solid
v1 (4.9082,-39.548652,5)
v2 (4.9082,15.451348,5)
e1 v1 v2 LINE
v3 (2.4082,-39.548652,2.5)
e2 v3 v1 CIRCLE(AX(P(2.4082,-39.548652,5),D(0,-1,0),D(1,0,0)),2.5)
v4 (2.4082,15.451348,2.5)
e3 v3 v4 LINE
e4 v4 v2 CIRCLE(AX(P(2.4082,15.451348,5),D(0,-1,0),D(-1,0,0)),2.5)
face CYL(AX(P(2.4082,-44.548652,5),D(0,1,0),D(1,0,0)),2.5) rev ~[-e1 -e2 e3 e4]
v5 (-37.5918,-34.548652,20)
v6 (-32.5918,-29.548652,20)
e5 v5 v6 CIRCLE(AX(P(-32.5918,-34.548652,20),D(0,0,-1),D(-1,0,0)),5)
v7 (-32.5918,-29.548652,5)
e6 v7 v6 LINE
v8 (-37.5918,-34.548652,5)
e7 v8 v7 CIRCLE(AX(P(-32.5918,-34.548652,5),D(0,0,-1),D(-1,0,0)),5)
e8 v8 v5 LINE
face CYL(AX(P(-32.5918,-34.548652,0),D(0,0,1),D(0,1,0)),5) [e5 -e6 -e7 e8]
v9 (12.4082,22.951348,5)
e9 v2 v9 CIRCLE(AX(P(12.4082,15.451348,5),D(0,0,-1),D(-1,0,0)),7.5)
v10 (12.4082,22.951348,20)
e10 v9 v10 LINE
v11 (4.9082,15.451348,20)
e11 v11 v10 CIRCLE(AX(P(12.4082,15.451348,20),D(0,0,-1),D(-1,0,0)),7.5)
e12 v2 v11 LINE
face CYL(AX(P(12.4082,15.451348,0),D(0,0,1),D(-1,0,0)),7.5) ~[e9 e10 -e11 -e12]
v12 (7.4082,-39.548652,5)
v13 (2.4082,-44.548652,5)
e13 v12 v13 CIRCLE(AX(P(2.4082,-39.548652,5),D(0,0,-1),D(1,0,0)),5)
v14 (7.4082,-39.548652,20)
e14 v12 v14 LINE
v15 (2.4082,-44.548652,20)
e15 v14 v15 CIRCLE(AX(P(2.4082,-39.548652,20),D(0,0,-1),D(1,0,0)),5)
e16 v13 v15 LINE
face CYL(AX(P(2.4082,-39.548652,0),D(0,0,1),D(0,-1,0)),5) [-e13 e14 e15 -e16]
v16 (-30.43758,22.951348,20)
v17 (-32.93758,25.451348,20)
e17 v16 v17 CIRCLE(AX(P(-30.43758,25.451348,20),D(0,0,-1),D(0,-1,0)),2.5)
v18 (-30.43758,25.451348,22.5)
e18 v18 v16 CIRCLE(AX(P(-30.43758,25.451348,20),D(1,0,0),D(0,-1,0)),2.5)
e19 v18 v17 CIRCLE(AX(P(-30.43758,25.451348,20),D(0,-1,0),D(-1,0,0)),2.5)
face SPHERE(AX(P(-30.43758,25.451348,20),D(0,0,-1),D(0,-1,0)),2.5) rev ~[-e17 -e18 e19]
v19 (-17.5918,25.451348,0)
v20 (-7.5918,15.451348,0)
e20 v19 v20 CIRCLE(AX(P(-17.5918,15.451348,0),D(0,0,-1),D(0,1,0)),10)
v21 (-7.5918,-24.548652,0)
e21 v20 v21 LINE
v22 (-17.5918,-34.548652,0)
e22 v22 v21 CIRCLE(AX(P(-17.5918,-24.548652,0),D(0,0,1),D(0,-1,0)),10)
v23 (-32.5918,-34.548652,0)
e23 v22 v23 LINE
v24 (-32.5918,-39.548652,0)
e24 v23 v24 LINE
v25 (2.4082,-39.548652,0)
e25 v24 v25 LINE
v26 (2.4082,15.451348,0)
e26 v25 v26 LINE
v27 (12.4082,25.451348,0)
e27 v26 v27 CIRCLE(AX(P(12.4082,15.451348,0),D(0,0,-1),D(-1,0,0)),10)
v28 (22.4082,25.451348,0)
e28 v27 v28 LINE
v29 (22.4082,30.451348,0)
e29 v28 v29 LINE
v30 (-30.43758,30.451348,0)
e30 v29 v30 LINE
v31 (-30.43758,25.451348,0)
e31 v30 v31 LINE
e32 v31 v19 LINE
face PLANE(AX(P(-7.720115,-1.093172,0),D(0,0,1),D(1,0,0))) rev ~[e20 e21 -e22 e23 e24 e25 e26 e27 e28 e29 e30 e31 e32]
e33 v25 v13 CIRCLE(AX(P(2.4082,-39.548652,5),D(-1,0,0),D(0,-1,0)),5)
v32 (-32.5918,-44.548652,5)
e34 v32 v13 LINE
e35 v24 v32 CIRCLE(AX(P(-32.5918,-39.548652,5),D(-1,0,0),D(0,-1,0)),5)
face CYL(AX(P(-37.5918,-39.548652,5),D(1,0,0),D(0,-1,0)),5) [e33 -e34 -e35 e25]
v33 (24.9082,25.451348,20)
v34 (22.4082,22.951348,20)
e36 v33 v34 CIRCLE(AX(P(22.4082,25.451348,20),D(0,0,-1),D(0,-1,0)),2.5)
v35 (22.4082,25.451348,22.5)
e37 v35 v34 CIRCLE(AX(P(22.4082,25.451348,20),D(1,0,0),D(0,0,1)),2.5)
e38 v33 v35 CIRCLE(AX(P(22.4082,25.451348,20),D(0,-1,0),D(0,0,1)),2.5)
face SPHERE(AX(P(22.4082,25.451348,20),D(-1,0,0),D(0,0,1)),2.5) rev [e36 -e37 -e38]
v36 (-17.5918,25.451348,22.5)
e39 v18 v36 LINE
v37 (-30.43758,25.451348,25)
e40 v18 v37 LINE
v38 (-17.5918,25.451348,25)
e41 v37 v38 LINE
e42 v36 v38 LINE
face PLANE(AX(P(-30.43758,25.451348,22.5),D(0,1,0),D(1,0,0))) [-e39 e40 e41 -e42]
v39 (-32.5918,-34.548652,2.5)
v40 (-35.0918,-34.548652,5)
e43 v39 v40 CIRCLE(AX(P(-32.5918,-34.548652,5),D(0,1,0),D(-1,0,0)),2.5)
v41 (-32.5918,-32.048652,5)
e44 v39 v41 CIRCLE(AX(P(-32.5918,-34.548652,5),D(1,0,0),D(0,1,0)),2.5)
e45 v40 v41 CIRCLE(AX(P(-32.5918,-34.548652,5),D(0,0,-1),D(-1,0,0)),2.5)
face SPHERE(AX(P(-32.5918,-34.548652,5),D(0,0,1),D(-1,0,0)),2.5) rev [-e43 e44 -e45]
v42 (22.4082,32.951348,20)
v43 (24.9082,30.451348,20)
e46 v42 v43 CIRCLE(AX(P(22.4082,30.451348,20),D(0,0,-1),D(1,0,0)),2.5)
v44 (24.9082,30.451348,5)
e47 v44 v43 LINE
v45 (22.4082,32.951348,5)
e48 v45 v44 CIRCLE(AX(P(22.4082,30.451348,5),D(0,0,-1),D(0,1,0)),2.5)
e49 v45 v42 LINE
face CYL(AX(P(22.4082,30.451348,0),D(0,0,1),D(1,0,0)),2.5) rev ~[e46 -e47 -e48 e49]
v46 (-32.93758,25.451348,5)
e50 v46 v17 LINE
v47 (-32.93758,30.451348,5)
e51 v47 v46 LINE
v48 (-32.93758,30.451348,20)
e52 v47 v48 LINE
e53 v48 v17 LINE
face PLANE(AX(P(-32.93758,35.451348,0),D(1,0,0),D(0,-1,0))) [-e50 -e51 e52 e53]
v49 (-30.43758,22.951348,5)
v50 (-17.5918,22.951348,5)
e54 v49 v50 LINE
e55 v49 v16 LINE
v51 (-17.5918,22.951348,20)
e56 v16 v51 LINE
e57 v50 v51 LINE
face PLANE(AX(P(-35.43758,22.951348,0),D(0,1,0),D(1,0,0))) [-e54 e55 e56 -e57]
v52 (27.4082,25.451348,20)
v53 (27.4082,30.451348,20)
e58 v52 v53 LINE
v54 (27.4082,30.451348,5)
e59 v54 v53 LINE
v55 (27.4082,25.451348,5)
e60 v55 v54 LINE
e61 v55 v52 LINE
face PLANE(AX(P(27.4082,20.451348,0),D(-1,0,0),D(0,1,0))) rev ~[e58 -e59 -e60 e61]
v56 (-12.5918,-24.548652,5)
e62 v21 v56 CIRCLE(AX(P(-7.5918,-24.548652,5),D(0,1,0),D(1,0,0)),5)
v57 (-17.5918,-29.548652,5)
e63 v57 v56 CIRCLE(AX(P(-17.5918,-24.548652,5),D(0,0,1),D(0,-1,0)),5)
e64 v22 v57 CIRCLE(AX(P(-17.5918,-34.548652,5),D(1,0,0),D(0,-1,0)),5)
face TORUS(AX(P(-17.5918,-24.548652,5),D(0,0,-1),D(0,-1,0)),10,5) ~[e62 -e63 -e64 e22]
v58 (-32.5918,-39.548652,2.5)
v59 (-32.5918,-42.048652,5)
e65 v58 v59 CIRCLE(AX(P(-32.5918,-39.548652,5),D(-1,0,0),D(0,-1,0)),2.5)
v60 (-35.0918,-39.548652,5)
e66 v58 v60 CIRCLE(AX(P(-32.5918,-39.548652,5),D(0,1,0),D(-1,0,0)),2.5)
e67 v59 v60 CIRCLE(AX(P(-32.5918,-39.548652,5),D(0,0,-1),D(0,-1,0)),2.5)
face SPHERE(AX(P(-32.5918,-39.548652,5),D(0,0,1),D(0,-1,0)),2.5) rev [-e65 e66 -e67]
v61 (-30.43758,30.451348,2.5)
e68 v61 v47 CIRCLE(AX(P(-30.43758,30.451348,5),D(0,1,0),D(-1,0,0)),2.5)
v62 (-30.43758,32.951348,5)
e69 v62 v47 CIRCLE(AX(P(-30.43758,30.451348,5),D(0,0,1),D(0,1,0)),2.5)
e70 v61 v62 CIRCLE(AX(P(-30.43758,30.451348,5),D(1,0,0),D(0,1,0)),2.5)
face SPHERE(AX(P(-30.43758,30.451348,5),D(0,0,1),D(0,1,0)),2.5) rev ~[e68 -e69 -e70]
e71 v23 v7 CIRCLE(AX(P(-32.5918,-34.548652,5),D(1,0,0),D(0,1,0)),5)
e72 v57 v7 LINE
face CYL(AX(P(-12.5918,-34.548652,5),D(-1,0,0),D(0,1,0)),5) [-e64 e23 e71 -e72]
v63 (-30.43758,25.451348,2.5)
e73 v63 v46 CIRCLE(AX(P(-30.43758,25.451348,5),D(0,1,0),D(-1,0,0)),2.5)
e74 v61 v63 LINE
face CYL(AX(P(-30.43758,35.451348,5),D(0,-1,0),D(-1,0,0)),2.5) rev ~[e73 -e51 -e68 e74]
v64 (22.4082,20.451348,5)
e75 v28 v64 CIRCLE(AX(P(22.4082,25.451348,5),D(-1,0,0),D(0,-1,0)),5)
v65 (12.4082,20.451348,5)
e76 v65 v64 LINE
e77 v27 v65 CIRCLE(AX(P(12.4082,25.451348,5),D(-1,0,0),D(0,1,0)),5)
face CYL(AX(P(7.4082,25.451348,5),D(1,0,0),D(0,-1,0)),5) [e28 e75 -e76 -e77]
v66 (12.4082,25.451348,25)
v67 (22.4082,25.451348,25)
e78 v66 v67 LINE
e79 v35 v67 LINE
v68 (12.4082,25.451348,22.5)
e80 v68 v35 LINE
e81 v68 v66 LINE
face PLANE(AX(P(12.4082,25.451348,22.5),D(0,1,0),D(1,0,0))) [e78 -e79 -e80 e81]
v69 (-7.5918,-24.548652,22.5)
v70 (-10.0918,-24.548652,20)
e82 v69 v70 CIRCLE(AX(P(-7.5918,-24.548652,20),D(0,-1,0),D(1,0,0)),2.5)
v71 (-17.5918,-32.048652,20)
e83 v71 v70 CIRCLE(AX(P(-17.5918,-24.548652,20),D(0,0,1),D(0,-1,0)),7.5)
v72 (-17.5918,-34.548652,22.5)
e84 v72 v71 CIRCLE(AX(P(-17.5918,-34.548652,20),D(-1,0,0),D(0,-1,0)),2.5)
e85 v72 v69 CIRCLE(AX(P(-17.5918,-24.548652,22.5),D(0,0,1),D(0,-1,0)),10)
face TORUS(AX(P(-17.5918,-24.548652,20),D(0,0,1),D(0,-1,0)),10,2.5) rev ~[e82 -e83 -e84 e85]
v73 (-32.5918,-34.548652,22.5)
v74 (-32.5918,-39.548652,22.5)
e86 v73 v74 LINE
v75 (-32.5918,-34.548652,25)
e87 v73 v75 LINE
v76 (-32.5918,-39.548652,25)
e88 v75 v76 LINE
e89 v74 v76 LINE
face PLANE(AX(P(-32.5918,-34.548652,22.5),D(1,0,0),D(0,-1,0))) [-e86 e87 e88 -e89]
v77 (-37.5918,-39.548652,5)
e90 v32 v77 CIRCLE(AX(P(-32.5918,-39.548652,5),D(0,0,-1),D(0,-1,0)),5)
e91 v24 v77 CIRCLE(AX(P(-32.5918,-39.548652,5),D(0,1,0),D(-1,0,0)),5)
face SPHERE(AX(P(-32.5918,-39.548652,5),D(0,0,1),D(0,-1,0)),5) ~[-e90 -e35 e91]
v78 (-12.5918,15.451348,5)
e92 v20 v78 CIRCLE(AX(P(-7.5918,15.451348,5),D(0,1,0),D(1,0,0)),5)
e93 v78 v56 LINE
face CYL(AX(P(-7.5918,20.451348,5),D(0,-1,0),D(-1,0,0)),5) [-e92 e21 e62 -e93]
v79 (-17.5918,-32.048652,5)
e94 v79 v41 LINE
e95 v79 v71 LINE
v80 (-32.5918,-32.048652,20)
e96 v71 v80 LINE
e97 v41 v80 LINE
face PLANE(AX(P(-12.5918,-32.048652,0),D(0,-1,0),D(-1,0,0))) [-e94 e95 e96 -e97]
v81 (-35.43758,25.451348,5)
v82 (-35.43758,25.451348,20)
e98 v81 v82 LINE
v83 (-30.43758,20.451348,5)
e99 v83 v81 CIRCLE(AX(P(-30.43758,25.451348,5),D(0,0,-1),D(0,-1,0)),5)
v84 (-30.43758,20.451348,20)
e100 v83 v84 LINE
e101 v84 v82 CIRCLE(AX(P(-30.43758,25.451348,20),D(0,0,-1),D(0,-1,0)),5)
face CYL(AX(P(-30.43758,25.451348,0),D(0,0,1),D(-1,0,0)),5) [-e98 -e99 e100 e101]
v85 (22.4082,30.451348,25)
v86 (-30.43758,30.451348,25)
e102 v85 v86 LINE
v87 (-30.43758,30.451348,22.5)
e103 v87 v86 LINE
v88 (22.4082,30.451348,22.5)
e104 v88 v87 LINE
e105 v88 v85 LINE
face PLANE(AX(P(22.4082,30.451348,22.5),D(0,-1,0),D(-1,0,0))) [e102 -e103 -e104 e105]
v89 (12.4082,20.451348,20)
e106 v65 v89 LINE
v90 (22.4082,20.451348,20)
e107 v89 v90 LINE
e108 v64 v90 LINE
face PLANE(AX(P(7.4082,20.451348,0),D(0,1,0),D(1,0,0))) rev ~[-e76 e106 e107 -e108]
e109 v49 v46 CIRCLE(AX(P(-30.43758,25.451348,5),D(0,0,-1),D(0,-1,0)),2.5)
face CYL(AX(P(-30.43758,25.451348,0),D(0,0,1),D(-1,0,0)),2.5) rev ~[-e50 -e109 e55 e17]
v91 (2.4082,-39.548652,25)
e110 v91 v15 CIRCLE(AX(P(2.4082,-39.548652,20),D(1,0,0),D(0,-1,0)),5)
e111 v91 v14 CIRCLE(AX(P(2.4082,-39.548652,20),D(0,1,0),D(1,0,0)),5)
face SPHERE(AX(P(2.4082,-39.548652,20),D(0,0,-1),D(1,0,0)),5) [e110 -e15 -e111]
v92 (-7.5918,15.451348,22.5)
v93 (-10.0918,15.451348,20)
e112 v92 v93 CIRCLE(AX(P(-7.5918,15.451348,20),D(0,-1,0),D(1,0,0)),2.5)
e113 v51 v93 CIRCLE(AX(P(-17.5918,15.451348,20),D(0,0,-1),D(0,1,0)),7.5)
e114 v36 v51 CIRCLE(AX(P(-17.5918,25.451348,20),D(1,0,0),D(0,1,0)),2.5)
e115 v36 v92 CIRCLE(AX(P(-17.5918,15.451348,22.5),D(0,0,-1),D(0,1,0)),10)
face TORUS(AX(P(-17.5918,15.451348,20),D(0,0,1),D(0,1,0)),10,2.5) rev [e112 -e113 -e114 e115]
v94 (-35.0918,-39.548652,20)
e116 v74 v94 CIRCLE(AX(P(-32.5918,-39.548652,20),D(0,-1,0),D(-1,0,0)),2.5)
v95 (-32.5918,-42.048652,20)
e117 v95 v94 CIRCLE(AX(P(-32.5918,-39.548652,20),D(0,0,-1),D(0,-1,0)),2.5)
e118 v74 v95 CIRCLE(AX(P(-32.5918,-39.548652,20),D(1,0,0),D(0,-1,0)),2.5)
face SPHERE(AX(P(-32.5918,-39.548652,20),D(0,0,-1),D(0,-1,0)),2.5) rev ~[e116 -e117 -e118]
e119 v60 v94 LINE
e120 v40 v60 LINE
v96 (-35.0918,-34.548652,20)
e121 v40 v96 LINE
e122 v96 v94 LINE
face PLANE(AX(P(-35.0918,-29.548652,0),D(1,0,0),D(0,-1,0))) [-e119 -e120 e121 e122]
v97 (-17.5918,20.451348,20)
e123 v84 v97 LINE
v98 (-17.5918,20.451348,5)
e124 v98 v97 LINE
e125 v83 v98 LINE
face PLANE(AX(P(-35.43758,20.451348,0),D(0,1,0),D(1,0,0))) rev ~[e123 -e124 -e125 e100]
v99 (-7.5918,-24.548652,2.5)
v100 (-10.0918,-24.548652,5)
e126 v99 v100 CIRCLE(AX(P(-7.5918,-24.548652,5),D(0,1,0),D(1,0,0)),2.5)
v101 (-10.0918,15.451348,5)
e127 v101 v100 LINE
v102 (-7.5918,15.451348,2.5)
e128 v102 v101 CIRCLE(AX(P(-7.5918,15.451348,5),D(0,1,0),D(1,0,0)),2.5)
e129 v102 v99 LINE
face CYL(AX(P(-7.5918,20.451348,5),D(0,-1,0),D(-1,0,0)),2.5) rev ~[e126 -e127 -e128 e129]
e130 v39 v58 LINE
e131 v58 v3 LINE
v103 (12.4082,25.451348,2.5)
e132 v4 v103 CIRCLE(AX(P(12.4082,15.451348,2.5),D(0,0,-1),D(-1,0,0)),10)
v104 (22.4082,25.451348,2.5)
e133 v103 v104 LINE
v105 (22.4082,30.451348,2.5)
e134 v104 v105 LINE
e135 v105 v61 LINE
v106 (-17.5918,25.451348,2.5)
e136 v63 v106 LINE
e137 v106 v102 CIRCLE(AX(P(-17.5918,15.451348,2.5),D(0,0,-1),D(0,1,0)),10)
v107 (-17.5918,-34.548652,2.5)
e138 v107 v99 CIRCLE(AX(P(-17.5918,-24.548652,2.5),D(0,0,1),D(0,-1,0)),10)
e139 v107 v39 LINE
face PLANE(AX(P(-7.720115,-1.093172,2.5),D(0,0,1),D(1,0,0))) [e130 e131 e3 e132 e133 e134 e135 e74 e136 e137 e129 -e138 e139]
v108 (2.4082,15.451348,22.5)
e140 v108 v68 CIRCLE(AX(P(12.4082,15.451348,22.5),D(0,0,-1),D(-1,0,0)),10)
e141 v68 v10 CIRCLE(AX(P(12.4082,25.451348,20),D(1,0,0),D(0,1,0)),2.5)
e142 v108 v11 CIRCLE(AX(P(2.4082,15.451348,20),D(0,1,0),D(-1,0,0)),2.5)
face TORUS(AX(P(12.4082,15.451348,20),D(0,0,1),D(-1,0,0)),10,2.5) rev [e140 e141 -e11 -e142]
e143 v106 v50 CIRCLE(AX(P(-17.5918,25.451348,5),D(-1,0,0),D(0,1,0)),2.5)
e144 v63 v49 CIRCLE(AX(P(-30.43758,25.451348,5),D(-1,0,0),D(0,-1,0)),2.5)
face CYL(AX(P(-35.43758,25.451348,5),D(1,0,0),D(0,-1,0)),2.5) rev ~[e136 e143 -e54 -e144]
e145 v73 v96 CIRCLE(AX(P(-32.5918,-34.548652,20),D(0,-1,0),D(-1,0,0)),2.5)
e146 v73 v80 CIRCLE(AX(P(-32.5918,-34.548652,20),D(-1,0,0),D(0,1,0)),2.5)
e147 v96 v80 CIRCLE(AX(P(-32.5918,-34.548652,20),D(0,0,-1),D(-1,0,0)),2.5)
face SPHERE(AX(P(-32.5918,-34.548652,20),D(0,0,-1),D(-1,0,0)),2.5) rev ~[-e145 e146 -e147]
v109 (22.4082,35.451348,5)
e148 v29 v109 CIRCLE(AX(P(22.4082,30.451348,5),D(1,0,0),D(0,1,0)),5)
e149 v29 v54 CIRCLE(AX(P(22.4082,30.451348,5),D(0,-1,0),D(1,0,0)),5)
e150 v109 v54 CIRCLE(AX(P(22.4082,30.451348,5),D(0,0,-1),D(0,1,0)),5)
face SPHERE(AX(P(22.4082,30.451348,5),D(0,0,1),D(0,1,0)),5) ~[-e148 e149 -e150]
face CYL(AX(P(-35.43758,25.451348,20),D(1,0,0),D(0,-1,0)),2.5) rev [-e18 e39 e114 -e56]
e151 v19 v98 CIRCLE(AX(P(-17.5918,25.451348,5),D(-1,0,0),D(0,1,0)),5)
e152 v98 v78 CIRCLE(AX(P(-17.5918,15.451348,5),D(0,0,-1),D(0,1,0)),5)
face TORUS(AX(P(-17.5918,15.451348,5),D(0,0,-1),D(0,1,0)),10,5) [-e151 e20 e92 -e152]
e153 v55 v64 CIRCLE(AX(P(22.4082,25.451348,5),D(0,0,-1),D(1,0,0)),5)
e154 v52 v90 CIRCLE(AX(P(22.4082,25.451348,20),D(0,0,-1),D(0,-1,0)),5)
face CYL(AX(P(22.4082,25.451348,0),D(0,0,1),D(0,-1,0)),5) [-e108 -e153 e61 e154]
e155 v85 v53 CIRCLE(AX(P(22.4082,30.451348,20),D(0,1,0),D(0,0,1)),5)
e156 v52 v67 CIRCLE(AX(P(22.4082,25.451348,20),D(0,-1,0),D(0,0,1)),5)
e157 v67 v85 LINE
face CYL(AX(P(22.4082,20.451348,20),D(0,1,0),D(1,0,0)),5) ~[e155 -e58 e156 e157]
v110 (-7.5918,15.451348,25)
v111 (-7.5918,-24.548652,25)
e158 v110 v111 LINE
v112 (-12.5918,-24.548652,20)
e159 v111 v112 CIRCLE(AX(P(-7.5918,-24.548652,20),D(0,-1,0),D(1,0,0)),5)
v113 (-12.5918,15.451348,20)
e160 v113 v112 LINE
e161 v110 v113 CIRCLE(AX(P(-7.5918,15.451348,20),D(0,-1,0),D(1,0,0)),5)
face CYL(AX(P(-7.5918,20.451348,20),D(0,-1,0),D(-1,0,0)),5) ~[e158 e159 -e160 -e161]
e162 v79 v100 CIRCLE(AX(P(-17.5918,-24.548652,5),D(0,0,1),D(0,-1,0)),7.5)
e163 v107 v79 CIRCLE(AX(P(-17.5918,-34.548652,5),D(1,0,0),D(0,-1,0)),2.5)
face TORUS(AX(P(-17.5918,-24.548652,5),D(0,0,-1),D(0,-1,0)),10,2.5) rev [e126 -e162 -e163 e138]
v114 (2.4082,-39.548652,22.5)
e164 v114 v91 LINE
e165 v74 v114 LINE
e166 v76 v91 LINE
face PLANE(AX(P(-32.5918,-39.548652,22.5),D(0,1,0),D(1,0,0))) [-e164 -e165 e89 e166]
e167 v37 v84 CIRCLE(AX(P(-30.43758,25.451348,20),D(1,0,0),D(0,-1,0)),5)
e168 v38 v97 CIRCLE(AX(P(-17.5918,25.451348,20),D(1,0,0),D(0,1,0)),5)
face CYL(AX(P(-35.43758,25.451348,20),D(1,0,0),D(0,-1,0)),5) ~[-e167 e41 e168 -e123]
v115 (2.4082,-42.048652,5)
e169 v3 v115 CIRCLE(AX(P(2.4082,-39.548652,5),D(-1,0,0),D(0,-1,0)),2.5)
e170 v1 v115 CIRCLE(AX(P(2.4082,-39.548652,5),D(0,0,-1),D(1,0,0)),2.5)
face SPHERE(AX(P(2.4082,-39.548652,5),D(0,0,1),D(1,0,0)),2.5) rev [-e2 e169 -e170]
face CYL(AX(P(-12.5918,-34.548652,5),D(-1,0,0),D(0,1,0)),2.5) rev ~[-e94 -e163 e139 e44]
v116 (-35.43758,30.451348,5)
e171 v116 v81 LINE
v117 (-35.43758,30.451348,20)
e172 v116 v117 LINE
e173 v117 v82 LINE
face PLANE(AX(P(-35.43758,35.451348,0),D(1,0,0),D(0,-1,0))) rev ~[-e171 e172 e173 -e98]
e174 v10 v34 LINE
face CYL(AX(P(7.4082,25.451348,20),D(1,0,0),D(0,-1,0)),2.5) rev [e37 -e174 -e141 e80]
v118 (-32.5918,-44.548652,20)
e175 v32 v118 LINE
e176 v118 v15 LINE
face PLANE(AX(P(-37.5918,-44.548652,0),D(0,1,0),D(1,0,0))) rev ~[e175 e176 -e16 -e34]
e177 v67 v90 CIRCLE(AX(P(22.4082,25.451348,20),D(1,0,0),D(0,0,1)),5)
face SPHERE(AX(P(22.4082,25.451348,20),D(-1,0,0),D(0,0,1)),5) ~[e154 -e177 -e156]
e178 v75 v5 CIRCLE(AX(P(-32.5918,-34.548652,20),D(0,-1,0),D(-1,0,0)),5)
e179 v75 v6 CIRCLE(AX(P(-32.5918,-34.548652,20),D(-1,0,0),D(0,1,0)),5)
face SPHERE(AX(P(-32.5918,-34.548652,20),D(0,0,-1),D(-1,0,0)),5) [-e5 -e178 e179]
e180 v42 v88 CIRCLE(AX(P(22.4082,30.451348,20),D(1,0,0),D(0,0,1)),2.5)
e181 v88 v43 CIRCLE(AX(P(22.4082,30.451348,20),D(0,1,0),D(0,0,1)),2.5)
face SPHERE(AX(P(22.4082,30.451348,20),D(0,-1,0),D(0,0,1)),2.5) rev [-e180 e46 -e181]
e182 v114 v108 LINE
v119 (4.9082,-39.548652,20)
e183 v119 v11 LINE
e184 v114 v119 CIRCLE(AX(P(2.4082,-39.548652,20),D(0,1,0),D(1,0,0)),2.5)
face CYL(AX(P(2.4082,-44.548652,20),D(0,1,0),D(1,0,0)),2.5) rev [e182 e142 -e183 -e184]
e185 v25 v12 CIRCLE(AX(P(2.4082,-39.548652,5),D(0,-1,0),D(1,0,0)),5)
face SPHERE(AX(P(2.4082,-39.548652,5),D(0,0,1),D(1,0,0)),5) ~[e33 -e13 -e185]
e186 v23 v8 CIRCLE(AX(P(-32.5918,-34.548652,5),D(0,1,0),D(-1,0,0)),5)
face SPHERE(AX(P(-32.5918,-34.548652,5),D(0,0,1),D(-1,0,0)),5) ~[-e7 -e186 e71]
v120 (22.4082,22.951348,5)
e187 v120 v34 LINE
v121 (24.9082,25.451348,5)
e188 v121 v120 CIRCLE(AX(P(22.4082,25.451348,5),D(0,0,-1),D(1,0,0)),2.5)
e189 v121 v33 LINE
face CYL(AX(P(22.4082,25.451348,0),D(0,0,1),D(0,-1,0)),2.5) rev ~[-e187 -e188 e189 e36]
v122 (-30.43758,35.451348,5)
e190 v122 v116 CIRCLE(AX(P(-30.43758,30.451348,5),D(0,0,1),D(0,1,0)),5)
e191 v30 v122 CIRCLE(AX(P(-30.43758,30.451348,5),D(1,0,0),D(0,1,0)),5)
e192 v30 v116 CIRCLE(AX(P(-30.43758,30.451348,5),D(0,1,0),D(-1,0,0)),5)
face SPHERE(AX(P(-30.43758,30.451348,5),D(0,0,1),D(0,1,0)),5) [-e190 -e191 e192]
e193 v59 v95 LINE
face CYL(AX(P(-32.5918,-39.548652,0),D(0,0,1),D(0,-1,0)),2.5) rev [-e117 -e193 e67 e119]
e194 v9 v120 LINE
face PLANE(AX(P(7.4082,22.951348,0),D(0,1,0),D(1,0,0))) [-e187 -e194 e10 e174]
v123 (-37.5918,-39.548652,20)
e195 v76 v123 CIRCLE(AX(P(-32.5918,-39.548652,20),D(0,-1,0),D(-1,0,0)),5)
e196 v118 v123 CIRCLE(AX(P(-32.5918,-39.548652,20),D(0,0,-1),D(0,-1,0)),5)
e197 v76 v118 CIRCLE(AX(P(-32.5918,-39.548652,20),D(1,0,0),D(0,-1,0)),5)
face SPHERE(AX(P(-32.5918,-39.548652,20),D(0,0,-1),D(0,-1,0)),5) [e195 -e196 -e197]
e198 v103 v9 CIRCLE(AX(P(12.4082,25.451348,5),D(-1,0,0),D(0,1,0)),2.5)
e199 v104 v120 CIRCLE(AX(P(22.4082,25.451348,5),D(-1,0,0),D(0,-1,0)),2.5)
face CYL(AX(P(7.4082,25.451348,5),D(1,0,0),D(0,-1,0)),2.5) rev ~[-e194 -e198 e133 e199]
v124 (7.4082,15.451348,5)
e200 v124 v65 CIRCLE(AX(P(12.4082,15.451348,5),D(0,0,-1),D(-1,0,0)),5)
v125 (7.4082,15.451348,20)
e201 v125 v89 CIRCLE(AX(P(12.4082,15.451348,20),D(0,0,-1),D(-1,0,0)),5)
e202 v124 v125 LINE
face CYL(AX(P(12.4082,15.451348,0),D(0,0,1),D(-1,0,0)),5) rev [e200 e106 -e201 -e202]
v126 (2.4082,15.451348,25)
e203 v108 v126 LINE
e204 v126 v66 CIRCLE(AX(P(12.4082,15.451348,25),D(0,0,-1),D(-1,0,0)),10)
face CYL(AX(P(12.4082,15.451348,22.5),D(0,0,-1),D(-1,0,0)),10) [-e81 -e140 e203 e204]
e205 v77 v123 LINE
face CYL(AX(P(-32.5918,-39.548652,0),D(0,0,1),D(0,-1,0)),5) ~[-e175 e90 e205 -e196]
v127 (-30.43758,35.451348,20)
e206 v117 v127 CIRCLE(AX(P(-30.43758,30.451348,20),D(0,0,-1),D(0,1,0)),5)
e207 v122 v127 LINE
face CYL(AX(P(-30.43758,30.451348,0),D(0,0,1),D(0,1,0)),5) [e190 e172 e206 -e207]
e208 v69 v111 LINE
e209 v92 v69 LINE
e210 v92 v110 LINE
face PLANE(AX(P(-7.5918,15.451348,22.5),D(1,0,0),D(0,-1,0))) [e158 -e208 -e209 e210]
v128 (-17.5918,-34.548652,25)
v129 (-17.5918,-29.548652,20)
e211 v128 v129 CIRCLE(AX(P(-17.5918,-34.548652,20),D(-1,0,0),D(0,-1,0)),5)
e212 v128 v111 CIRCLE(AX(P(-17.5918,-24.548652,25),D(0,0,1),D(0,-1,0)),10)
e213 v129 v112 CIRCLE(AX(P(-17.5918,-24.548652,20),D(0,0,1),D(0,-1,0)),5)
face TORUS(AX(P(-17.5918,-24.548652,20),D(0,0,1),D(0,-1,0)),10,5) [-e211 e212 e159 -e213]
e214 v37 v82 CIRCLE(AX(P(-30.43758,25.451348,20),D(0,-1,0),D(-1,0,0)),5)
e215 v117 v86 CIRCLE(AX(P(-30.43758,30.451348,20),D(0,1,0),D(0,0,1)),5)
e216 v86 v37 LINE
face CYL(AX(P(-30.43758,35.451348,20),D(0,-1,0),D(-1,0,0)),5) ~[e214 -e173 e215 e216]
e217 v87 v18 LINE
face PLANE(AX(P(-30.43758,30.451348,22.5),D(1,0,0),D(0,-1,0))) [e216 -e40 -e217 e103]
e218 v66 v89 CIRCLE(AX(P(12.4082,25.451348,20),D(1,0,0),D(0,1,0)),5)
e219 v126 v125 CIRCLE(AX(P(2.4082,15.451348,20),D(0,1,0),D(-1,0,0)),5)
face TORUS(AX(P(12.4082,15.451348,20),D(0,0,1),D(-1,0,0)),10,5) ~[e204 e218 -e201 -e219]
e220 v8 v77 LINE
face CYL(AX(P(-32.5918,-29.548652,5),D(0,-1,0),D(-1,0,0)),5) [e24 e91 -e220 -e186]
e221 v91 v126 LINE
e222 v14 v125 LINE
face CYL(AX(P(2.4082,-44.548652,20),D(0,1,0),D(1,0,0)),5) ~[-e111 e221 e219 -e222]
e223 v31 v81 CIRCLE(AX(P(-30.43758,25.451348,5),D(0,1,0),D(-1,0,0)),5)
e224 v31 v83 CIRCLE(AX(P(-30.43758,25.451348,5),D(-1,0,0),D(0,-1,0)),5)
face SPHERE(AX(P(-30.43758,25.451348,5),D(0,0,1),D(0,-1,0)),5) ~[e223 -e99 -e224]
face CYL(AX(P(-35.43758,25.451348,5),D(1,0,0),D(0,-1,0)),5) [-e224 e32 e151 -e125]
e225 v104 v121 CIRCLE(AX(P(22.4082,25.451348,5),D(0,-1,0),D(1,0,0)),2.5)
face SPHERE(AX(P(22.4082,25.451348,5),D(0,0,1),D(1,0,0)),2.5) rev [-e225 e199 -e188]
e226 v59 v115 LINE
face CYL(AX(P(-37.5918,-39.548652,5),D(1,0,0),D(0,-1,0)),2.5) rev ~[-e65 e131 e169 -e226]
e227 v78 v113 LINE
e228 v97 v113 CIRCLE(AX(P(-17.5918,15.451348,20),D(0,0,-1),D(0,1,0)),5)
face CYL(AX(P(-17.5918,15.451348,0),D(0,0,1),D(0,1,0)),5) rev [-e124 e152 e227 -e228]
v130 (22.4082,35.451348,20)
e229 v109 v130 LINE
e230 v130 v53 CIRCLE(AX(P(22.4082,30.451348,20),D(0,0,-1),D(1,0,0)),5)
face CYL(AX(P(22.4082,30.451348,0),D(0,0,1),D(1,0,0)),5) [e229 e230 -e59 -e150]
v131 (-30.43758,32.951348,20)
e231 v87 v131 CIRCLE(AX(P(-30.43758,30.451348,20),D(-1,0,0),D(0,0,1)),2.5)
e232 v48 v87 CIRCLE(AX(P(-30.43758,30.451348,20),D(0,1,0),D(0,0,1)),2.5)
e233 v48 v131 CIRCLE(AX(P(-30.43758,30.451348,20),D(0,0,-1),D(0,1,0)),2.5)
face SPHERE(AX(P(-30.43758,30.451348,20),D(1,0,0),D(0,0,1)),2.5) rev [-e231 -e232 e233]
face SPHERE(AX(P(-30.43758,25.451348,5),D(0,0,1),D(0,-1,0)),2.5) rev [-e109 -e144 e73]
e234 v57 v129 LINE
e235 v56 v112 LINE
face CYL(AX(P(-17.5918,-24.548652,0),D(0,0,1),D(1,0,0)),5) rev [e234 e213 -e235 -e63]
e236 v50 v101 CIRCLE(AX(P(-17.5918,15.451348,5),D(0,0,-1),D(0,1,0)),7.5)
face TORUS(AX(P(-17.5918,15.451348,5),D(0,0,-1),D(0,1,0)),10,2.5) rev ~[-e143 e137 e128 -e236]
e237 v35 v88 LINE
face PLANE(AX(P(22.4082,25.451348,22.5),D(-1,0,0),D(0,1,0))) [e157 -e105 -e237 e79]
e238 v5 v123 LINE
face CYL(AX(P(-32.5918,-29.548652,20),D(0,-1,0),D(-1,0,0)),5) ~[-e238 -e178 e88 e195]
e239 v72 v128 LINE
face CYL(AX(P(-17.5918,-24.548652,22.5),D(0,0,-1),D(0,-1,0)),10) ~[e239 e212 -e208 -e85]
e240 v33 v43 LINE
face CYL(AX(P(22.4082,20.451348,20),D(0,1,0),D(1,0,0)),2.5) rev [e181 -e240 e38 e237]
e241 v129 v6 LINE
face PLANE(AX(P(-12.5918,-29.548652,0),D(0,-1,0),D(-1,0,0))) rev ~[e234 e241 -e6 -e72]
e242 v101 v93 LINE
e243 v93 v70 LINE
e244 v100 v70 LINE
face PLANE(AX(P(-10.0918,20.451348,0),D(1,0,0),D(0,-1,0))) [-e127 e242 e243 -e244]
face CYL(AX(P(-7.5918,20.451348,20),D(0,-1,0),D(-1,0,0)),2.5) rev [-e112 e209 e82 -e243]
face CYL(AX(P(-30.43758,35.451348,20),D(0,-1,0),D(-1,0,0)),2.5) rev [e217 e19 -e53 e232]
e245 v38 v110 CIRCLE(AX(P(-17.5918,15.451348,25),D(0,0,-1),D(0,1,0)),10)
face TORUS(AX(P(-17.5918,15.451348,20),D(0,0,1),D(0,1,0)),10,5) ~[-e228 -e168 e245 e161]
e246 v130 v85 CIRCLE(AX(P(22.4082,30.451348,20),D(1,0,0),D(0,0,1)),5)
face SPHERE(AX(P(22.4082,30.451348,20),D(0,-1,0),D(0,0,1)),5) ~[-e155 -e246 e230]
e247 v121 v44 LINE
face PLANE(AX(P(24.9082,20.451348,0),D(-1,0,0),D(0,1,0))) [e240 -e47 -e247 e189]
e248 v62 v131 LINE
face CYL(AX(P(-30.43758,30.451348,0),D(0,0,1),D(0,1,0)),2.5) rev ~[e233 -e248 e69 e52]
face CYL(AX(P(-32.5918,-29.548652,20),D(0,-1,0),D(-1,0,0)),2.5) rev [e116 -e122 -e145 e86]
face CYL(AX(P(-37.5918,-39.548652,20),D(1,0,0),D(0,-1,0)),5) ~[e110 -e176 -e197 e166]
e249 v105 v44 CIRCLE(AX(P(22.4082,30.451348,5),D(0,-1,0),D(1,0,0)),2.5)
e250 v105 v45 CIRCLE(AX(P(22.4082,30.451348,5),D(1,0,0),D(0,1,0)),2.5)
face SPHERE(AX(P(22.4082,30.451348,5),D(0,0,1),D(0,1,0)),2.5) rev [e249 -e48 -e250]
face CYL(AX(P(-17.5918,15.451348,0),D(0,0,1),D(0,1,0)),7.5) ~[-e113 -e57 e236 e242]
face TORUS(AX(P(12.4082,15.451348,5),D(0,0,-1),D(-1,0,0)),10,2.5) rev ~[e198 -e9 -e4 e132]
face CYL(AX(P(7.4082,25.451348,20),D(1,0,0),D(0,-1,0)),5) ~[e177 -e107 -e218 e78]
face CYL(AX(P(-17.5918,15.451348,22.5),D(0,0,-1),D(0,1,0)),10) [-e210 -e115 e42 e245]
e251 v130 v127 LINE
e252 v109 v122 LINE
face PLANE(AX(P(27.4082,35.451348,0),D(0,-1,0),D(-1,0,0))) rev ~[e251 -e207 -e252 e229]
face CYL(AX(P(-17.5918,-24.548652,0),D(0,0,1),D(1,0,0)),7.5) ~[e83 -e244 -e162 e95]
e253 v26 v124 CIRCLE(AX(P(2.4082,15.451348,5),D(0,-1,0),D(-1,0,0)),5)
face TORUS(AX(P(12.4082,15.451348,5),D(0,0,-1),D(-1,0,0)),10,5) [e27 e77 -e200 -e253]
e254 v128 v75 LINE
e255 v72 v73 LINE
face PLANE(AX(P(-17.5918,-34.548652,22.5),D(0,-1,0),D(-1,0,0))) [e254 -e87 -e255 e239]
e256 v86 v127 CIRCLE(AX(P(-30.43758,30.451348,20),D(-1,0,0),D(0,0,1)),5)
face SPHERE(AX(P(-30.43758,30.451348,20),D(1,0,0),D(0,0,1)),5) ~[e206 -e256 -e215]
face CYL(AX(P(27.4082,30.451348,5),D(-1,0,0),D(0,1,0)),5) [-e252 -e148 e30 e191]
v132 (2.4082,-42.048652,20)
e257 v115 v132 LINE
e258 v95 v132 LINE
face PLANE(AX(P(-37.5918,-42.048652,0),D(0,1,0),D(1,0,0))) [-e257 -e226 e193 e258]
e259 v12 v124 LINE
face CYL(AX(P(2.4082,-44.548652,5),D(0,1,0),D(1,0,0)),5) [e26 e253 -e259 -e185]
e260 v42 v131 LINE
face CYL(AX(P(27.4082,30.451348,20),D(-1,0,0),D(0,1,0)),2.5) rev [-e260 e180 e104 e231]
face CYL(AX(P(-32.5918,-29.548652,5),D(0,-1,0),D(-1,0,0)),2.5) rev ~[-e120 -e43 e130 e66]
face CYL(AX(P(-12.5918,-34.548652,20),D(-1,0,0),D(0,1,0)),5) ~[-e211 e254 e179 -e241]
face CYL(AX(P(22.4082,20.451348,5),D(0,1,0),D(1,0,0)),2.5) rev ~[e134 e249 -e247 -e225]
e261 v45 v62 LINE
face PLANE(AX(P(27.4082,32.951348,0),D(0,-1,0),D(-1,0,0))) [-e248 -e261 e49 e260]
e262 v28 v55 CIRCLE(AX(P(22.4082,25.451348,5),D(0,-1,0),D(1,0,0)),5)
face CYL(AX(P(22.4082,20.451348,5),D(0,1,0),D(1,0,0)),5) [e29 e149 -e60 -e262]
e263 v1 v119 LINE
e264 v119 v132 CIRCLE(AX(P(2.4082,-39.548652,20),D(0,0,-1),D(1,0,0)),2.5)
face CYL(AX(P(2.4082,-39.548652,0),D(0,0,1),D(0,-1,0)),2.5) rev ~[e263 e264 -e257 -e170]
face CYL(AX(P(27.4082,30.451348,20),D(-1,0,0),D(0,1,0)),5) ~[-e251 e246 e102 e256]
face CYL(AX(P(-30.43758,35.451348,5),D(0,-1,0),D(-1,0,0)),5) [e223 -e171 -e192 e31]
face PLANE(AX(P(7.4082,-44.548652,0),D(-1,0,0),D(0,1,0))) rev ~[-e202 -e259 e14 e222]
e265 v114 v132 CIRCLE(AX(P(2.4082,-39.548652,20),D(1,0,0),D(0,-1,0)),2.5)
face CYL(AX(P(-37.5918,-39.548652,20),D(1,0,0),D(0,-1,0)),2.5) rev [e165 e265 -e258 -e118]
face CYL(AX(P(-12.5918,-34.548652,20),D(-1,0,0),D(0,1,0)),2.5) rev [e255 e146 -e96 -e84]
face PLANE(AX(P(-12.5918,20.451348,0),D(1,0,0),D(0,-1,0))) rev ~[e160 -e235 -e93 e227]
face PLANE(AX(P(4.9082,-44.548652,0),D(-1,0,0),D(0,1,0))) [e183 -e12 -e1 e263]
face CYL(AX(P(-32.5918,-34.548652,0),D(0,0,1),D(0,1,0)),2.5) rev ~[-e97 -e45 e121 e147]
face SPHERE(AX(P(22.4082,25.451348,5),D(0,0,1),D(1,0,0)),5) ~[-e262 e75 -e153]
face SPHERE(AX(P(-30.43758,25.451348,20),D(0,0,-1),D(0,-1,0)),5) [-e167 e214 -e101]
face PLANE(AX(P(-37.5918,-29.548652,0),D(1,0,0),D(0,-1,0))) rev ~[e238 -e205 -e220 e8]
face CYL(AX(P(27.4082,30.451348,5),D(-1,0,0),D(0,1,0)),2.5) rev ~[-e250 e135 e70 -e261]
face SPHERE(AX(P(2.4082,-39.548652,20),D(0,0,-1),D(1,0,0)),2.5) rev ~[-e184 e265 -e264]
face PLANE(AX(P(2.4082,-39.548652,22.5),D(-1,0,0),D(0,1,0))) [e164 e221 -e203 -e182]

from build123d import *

# Parameters (mm, degrees)
F1_DEPTH = 25
F2_R     = 5
F3_T     = -2.5


# Not quite as in the source:
# - a shell that OpenCascade refuses in one call is made with other operations: the cavity is built on its own and cut out


with BuildPart() as f1:
    # F0 (on Top) → F1 (new body)
    with BuildSketch(Plane.XY):
        Polygon((-37.5918000937, -44.5486523956), (-12.5918000937, -44.5486523956), (7.4081999063, -44.5486523956), (7.4081999063, 20.4513476044), (27.4081999063, 20.4513476044), (27.4081999063, 35.4513476044), (-35.4375796765, 35.4513476044), (-35.4375796765, 20.4513476044), (-12.5918000937, 20.4513476044), (-12.5918000937, -29.5486523956), (-37.5918000937, -29.5486523956), align=None)
    extrude(amount=F1_DEPTH)

    # F2
    f2_edges = [f1.edges().sort_by_distance(p)[0] for p in [
        (-35.43758, 20.451348, 12.5),
        (-12.5918, 20.451348, 12.5),
        (-24.01469, 20.451348, 0),
        (-24.01469, 20.451348, 25),
        (7.4082, -44.548652, 12.5),
        (7.4082, 20.451348, 12.5),
        (7.4082, -12.048652, 0),
        (7.4082, -12.048652, 25),
        (-37.5918, -44.548652, 12.5),
        (-15.0918, -44.548652, 25),
        (-15.0918, -44.548652, 0),
        (-37.5918, -29.548652, 12.5),
        (-37.5918, -37.048652, 0),
        (-37.5918, -37.048652, 25),
        (-12.5918, -29.548652, 12.5),
        (-25.0918, -29.548652, 0),
        (-25.0918, -29.548652, 25),
        (-12.5918, -4.548652, 25),
        (17.4082, 20.451348, 25),
        (27.4082, 27.951348, 25),
        (-4.01469, 35.451348, 25),
        (-35.43758, 27.951348, 25),
        (27.4082, 35.451348, 12.5),
        (-35.43758, 35.451348, 12.5),
        (-4.01469, 35.451348, 0),
        (27.4082, 20.451348, 12.5),
        (27.4082, 27.951348, 0),
        (-12.5918, -4.548652, 0),
        (17.4082, 20.451348, 0),
        (-35.43758, 27.951348, 0),
    ]]
    fillet(f2_edges, radius=F2_R)

    # F3: a shell. OpenCascade refuses it in one call, so the cavity is built on its own and cut out:
    # the body offset inwards by the wall thickness, plus a prism from it out through each open face.
    f3_core = offset(f1.part, amount=F3_T, mode=Mode.PRIVATE)
    f3_exits = [f3_core.faces().sort_by_distance(p)[0] for p in [
        (-5.055266, -1.381038, 22.5),
    ]]
    add(f3_core, mode=Mode.SUBTRACT)
    extrude(f3_exits, amount=-F3_T, mode=Mode.SUBTRACT)


solid = f1.part
